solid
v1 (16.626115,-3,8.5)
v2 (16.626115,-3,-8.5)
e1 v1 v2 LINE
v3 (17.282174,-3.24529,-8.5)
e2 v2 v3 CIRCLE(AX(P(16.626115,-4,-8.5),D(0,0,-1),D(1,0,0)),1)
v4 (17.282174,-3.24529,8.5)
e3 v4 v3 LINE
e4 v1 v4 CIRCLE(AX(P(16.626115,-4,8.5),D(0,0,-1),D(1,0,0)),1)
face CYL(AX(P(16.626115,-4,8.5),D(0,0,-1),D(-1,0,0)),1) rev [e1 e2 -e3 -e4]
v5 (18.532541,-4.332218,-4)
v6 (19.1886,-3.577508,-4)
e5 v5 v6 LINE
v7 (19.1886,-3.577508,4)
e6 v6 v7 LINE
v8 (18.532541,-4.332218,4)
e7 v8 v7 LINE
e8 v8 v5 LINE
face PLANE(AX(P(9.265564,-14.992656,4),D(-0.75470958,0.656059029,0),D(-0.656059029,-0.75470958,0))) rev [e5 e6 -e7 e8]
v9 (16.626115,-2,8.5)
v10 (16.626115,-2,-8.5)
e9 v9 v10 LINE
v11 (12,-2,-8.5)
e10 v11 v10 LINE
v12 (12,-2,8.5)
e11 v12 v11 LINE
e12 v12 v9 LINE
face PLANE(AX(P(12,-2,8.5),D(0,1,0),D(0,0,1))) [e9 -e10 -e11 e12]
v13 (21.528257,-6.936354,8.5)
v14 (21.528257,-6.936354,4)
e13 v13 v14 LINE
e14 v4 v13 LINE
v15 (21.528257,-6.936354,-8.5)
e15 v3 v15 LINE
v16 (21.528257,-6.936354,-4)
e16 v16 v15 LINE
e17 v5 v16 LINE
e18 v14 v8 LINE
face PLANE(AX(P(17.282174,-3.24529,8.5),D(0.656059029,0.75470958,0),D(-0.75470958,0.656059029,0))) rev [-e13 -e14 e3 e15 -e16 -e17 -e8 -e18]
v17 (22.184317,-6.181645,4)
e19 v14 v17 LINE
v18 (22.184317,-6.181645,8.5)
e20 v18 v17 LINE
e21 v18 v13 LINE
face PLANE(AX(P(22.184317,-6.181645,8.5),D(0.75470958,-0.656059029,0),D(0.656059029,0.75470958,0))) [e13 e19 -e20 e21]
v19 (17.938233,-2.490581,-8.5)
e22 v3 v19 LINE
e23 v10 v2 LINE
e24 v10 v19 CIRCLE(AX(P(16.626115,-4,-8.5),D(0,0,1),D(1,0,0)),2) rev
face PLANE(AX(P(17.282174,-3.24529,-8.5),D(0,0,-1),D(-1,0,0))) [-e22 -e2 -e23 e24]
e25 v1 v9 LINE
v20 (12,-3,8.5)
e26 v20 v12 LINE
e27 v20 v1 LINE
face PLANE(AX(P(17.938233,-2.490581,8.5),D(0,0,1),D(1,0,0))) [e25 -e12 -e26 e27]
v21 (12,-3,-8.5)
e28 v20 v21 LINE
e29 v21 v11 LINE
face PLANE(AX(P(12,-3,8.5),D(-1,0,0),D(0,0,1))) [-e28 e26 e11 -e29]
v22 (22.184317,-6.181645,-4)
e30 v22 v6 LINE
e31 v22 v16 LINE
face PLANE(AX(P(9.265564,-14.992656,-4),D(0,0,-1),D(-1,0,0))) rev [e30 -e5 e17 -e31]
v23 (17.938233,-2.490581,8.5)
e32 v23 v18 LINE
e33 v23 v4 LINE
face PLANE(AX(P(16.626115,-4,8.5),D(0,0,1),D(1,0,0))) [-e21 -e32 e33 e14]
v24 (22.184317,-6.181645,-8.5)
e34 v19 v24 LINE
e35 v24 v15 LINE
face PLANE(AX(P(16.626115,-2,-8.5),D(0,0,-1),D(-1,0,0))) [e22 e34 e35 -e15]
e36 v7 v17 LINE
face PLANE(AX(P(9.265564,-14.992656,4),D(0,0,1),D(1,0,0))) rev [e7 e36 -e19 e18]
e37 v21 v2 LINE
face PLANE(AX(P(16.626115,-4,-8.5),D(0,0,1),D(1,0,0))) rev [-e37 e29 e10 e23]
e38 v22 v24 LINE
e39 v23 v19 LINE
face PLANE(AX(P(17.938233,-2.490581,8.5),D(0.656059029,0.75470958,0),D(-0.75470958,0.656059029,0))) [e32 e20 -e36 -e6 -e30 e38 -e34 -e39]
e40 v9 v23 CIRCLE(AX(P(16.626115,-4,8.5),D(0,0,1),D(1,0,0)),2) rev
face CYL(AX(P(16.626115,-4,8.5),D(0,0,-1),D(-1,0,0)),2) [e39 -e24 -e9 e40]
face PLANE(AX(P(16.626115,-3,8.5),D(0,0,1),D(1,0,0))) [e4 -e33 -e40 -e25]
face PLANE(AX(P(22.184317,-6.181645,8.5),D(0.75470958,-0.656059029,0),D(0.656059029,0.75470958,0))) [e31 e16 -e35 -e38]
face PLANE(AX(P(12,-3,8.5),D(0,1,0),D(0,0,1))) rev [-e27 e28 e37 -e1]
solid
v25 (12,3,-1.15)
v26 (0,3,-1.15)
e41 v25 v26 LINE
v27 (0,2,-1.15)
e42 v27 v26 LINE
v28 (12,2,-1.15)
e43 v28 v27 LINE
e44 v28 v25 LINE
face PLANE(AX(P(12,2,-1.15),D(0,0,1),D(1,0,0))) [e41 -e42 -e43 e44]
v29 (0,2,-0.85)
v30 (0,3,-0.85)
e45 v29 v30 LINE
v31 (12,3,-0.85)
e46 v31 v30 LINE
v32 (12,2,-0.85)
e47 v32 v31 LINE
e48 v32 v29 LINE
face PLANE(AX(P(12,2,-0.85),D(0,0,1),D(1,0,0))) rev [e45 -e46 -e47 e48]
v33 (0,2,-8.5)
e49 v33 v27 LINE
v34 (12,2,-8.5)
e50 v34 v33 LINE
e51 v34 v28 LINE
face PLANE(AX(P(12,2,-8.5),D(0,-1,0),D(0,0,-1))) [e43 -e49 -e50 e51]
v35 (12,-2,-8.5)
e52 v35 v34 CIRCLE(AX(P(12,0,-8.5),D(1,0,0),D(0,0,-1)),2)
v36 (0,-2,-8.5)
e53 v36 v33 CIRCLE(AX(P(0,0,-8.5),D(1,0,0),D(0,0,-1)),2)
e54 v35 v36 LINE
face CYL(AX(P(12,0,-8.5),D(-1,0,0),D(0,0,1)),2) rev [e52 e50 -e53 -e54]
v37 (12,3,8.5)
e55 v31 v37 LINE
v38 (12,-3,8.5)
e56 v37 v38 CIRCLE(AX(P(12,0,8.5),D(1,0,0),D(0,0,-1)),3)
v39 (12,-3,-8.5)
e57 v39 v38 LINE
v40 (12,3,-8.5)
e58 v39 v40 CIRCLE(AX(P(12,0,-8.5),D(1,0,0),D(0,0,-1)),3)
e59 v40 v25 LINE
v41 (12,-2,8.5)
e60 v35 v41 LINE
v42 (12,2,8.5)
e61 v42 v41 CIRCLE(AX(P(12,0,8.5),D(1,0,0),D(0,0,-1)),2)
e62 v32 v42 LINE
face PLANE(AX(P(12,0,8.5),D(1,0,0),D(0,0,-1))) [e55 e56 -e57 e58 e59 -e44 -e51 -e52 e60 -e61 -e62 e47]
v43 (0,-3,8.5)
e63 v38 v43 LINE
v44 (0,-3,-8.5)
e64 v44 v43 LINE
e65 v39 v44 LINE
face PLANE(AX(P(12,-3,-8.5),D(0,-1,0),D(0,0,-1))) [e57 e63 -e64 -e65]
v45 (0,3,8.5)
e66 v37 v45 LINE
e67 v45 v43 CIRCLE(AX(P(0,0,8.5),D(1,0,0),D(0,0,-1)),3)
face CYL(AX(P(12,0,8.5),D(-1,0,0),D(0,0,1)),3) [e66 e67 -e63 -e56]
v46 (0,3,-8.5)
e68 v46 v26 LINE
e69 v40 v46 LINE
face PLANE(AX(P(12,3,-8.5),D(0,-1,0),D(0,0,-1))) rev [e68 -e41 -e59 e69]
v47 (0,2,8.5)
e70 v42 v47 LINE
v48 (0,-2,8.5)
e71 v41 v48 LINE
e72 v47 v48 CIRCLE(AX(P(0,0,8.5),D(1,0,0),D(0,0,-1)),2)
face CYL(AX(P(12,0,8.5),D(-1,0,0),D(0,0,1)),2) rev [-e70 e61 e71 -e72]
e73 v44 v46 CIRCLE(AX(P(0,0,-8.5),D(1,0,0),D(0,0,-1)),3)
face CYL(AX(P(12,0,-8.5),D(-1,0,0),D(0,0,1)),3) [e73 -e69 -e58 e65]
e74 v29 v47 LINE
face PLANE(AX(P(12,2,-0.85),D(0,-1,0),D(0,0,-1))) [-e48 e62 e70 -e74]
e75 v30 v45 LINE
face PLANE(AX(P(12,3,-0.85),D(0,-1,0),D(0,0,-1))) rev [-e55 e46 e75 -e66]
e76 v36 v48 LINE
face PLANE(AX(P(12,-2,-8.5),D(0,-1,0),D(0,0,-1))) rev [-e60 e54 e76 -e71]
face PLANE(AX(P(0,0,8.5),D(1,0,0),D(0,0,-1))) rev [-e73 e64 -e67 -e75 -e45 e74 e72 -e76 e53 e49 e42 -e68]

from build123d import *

# Parameters (mm, degrees)
BOSS_EXTRUDE1_DEPTH = 12
BASE_FLANGE1_DEPTH  = 8.5
SKETCH7_W           = 8
SKETCH7_H           = 7.938725448
CUT_EXTRUDE1_DEPTH  = 1


# Sheet-metal steps are written as plain solids
with BuildPart() as part:
    # Sketch1 → Boss-Extrude1 (new body)
    with BuildSketch(Plane(origin=(0, 0, 0), x_dir=(0, 0, -1), z_dir=(1, 0, 0))):
        with BuildLine():
            Line((8.5, -3), (-8.5, -3))
            ThreePointArc((-8.5, -3), (-11.5, 0), (-8.5, 3))
            Line((-8.5, 3), (0.85, 3))
            Line((0.85, 3), (0.85, 2))
            Line((0.85, 2), (-8.5, 2))
            ThreePointArc((-8.5, 2), (-10.5, 0), (-8.5, -2))
            Line((-8.5, -2), (8.5, -2))
            ThreePointArc((8.5, -2), (10.5, 0), (8.5, 2))
            Line((8.5, 2), (1.15, 2))
            Line((1.15, 2), (1.15, 3))
            Line((1.15, 3), (8.5, 3))
            ThreePointArc((8.5, 3), (11.5, 0), (8.5, -3))
        make_face()
    extrude(amount=BOSS_EXTRUDE1_DEPTH)


with BuildPart() as body_2:
    # Sketch2 → Base-Flange1 (new, symmetric)
    with BuildSketch(Plane.XY):
        with BuildLine():
            Line((12, -3), (16.626115321, -3))
            ThreePointArc((16.626115321, -3), (16.976322702, -3.063327811), (17.28217435, -3.24529042))
            Line((17.28217435, -3.24529042), (21.528257481, -6.936354174))
            Line((21.528257481, -6.936354174), (22.18431651, -6.181644594))
            Line((22.18431651, -6.181644594), (17.938233378, -2.49058084))
            ThreePointArc((17.938233378, -2.49058084), (17.326530083, -2.126655622), (16.626115321, -2))
            Line((16.626115321, -2), (12, -2))
            Line((12, -2), (12, -3))
        make_face()
    extrude(amount=BASE_FLANGE1_DEPTH, both=True)

    # Sketch7 → Cut-Extrude1 (cut)
    with BuildSketch(Plane(origin=(6.487685568, 7.463228513, 0), x_dir=(0, 0, -1), z_dir=(0.6560590289905088, 0.7547095802227708, 0))):
        with Locations((0, -20.798239951)):
            Rectangle(SKETCH7_W, SKETCH7_H)
    extrude(amount=-CUT_EXTRUDE1_DEPTH, mode=Mode.SUBTRACT)


solid = Compound([part.part, body_2.part])
